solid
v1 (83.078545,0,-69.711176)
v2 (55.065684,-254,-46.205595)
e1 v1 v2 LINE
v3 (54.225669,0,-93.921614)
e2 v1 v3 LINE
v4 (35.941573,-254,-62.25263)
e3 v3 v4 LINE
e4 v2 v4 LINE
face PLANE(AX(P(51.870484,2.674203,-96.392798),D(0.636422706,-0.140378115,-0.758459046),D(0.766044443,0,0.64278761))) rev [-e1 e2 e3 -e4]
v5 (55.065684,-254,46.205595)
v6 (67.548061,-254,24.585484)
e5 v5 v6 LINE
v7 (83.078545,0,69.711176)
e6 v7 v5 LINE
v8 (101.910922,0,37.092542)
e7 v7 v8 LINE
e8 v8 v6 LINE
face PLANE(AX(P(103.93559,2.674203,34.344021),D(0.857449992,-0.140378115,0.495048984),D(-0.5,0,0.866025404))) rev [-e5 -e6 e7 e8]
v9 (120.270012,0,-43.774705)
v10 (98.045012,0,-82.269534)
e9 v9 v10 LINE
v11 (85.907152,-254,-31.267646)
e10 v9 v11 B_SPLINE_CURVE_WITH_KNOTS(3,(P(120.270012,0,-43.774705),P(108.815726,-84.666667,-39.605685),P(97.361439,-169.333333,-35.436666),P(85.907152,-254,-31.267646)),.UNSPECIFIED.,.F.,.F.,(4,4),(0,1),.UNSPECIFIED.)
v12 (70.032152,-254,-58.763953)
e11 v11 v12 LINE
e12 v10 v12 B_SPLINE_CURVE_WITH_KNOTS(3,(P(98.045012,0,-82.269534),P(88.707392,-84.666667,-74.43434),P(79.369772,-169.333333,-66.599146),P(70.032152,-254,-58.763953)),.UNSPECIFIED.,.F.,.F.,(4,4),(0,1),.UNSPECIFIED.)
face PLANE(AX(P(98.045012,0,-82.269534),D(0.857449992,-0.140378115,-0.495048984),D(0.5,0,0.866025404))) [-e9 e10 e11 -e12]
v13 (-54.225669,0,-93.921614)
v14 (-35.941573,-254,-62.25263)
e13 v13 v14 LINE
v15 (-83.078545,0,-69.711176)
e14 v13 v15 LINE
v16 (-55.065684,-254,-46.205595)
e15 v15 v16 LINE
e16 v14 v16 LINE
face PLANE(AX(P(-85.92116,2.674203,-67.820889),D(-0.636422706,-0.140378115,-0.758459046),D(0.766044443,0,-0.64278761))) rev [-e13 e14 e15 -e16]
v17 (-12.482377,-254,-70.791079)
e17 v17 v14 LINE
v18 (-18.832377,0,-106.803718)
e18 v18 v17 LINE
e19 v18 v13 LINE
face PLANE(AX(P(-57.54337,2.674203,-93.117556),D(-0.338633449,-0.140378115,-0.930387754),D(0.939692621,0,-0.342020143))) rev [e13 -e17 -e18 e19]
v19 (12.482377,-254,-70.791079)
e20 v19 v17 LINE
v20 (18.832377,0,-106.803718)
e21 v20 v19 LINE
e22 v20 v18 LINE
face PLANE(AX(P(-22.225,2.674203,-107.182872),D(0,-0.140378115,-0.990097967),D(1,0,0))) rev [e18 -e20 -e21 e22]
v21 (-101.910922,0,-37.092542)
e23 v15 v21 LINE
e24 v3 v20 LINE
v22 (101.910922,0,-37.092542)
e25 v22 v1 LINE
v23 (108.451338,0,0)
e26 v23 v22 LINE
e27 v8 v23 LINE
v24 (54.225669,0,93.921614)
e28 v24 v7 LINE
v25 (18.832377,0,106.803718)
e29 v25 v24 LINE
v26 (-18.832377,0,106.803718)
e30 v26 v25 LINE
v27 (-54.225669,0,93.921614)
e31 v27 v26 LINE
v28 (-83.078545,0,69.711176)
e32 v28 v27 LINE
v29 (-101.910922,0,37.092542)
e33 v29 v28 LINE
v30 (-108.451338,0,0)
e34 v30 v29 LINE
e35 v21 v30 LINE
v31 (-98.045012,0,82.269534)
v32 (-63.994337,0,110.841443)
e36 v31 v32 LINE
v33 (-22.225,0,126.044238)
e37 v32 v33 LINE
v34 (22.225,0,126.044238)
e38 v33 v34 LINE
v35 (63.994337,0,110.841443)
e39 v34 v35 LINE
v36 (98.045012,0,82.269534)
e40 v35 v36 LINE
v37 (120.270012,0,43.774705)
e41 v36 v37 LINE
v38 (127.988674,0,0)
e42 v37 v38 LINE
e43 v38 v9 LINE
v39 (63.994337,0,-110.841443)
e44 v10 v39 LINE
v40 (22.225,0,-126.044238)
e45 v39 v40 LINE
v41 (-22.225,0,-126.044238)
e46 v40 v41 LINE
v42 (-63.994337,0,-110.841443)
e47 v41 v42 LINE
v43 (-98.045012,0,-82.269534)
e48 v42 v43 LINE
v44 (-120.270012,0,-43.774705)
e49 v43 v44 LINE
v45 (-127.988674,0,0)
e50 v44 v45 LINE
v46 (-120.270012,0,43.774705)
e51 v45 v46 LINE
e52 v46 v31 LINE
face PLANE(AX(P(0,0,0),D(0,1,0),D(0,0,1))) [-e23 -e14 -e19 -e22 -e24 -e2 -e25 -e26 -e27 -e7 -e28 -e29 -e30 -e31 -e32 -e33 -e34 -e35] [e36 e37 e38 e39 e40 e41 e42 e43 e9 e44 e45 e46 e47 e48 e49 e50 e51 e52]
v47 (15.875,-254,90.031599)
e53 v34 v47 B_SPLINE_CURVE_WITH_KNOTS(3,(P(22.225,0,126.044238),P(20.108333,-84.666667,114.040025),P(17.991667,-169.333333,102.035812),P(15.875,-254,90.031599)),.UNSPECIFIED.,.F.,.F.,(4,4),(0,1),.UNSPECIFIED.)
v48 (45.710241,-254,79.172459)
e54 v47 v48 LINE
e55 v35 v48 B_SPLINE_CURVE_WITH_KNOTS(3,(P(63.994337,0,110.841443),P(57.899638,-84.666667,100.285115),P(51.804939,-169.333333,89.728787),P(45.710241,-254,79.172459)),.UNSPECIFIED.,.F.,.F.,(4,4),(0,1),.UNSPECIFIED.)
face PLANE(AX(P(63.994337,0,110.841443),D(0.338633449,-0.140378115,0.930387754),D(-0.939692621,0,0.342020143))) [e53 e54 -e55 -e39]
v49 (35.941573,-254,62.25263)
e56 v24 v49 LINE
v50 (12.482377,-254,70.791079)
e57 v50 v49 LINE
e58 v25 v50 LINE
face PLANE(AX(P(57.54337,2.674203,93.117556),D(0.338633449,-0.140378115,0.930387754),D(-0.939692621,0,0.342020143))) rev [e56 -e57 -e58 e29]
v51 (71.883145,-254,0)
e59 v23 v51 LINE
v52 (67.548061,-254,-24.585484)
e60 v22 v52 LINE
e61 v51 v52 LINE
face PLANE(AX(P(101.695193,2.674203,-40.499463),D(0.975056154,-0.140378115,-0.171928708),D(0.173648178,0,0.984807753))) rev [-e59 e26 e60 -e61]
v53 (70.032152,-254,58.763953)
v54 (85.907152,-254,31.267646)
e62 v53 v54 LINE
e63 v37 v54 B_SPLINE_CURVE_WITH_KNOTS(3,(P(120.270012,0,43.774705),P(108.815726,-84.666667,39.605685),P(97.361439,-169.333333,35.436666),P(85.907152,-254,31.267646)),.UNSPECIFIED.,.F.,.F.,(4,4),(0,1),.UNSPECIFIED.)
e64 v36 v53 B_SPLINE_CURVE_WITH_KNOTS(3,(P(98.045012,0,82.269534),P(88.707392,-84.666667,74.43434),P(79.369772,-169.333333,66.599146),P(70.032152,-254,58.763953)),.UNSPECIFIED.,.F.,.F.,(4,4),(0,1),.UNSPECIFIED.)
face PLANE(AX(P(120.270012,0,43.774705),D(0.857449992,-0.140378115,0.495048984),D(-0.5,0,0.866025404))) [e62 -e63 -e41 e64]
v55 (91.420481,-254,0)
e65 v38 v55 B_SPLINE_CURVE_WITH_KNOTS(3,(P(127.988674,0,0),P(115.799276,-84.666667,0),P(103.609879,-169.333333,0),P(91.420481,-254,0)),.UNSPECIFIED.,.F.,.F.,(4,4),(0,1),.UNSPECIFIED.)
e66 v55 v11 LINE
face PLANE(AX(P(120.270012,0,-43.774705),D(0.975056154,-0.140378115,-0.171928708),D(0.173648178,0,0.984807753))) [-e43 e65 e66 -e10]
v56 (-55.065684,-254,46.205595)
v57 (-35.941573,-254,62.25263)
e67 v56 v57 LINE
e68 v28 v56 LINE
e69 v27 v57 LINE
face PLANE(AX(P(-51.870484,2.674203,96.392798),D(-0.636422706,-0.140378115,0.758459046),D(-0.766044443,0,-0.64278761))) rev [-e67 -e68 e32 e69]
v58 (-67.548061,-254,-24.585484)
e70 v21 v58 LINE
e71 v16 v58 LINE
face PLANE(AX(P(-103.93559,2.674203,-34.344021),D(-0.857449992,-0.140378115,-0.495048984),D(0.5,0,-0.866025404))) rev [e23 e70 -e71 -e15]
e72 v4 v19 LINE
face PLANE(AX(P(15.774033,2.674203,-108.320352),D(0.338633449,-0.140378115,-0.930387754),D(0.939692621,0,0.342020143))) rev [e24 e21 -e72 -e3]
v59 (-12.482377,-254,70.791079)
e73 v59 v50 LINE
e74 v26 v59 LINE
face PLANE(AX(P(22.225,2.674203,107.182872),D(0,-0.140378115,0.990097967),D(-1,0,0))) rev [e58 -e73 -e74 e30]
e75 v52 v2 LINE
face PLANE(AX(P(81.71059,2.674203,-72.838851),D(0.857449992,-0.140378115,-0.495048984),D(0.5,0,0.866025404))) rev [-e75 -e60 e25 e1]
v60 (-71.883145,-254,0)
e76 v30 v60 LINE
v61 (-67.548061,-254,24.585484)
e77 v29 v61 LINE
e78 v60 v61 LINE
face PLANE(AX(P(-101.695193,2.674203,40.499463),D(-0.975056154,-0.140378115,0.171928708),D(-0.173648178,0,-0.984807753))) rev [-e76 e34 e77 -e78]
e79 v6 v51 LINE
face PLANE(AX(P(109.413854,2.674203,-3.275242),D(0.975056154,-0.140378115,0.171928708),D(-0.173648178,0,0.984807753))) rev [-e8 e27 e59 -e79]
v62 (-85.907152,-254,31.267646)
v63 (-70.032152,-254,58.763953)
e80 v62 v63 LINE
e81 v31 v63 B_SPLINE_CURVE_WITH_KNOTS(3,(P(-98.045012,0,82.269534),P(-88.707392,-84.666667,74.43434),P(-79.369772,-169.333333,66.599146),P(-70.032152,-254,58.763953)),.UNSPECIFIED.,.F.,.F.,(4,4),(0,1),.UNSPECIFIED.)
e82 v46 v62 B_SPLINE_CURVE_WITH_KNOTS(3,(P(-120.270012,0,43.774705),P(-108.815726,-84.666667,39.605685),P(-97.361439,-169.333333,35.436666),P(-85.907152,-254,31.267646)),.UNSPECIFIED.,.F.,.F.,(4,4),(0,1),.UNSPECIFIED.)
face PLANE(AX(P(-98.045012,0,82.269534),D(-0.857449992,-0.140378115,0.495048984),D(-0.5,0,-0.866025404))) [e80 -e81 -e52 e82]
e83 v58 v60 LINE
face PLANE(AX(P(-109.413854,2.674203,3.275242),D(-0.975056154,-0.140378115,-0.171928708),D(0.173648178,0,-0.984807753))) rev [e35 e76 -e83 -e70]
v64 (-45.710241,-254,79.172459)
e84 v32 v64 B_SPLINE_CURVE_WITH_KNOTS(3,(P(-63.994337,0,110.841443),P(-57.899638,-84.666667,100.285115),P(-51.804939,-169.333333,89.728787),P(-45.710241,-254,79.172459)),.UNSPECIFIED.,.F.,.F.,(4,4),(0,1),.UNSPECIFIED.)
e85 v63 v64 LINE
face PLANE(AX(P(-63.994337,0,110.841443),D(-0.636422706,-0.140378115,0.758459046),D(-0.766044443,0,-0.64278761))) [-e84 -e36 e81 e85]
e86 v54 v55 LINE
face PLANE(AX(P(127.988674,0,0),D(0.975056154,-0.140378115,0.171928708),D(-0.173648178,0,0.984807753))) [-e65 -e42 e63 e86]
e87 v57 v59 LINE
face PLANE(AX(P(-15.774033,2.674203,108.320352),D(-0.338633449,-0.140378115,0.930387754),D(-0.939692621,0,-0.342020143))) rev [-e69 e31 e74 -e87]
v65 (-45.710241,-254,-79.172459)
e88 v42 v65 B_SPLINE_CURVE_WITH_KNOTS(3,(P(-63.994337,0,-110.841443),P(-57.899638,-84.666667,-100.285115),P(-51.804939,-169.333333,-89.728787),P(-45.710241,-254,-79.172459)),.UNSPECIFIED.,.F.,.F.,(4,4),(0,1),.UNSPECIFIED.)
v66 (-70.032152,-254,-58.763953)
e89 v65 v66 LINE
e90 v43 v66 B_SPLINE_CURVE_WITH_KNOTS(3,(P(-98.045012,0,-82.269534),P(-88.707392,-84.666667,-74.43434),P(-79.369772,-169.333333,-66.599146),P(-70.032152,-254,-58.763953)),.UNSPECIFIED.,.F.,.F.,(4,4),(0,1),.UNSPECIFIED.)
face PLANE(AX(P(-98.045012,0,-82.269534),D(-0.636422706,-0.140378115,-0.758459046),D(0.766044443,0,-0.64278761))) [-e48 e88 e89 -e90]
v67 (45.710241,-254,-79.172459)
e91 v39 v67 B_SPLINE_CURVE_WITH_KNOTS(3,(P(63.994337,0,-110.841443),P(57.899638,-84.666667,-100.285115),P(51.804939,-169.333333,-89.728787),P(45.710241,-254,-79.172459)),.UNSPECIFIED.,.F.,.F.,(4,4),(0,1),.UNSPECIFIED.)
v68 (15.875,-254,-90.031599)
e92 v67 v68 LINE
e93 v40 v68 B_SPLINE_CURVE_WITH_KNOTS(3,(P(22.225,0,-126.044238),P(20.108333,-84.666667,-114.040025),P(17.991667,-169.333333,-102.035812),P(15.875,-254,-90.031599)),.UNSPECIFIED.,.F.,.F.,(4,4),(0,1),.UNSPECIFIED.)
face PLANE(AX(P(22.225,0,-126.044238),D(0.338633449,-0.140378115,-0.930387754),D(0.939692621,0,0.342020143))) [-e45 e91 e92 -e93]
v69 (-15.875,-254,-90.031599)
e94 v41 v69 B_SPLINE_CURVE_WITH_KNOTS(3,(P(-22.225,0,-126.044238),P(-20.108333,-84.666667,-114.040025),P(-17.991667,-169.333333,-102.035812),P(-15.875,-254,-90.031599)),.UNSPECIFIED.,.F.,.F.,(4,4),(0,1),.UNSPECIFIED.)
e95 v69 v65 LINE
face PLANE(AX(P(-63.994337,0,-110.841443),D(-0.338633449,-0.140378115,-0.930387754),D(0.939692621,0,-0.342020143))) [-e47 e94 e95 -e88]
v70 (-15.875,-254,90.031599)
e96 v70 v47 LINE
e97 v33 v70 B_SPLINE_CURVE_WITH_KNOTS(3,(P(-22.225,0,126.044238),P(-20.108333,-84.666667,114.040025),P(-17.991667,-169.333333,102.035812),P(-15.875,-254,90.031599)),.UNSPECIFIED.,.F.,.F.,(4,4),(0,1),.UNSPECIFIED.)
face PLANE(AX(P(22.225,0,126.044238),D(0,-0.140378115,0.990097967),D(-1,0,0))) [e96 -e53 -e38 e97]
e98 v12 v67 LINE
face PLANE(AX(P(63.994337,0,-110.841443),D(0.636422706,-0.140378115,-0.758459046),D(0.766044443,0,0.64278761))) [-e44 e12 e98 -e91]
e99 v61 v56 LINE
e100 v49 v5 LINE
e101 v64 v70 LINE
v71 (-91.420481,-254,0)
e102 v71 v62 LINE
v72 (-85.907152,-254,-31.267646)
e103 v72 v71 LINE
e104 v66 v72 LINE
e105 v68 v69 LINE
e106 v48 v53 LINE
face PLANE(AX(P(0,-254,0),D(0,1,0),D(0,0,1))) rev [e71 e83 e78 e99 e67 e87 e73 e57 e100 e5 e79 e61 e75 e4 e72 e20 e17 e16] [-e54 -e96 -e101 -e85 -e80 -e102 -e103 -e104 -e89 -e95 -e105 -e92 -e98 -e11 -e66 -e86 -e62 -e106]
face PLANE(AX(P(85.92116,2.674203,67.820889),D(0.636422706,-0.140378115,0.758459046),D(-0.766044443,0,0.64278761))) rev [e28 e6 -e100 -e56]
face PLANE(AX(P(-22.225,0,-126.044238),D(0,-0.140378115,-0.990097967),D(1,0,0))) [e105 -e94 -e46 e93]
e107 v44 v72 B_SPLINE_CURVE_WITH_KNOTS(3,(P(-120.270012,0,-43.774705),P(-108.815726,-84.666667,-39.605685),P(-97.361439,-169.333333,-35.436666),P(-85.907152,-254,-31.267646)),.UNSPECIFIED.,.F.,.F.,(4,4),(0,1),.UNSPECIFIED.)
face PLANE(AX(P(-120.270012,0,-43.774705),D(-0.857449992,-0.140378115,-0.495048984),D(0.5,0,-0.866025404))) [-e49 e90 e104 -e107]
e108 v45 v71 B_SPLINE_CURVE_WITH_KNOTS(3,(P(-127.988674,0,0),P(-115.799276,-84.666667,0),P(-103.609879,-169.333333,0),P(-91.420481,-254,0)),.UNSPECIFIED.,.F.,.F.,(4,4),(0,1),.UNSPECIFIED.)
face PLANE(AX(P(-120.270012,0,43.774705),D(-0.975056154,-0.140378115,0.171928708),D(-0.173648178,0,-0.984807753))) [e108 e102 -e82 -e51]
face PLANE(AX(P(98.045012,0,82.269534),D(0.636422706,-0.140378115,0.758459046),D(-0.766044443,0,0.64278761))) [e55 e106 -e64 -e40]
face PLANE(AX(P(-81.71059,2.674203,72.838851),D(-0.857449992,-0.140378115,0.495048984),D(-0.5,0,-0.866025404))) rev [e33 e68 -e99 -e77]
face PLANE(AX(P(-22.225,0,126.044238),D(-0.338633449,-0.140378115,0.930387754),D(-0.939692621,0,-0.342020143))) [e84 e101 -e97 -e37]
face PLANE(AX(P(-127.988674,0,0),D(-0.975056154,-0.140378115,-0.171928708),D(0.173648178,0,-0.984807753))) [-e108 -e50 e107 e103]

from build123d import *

# Parameters (mm, degrees)
LOFT1_DEPTH = 254
LOFT1_DRAFT = -8.0697267
SHELL1_T    = -19.05


# Read off the part's stored shape, not the designer's step: Loft1
with BuildPart() as part:
    # Loft1 outline → Loft1 (with draft: the straight prism first)
    with BuildSketch(Plane(origin=(0, -254, 0), x_dir=(1, 0, 0), z_dir=(0, 1, 0))):
        Polygon((45.71024071, -79.172459336), (70.032151779, -58.763952728), (85.907151779, -31.267646158), (91.42048142, 0), (85.907151779, 31.267646158), (70.032151779, 58.763952728), (45.71024071, 79.172459336), (15.875, 90.031598886), (-15.875, 90.031598886), (-45.71024071, 79.172459336), (-70.032151779, 58.763952728), (-85.907151779, 31.267646158), (-91.42048142, 0), (-85.907151779, -31.267646158), (-70.032151779, -58.763952728), (-45.71024071, -79.172459336), (-15.875, -90.031598886), (15.875, -90.031598886), align=None)
    extrude(amount=LOFT1_DEPTH)
    # Loft1: the draft: its side faces are tilted about the plane it starts from
    loft1_sides = [part.faces().sort_by_distance(p)[0] for p in [
        (57.871196245, -127, 68.968206032),
        (77.969651779, -127, 45.015799443),
        (88.6638166, -127, 15.633823079),
        (88.663816599, -127, -15.633823079),
        (77.969651779, -127, -45.015799443),
        (57.871196244, -127, -68.968206032),
        (30.792620355, -127, -84.602029111),
        (0, -127, -90.031598886),
        (-30.792620355, -127, -84.602029111),
        (-57.871196245, -127, -68.968206032),
        (-77.969651779, -127, -45.015799443),
        (-88.6638166, -127, -15.633823079),
        (-88.663816599, -127, 15.633823079),
        (-77.969651779, -127, 45.015799443),
        (-57.871196244, -127, 68.968206032),
        (-30.792620355, -127, 84.602029111),
        (0, -127, 90.031598886),
        (30.792620355, -127, 84.602029111),
    ]]
    draft(loft1_sides, Plane(origin=(0, -254, 0), x_dir=(1, 0, 0), z_dir=(0, 1, 0)), LOFT1_DRAFT)

    # Shell1
    shell1_openings = [part.faces().sort_by_distance(p)[0] for p in [
        (0, 0, 0),
        (0, -254, 0),
    ]]
    offset(amount=SHELL1_T, openings=shell1_openings, kind=Kind.INTERSECTION)


solid = part.part
